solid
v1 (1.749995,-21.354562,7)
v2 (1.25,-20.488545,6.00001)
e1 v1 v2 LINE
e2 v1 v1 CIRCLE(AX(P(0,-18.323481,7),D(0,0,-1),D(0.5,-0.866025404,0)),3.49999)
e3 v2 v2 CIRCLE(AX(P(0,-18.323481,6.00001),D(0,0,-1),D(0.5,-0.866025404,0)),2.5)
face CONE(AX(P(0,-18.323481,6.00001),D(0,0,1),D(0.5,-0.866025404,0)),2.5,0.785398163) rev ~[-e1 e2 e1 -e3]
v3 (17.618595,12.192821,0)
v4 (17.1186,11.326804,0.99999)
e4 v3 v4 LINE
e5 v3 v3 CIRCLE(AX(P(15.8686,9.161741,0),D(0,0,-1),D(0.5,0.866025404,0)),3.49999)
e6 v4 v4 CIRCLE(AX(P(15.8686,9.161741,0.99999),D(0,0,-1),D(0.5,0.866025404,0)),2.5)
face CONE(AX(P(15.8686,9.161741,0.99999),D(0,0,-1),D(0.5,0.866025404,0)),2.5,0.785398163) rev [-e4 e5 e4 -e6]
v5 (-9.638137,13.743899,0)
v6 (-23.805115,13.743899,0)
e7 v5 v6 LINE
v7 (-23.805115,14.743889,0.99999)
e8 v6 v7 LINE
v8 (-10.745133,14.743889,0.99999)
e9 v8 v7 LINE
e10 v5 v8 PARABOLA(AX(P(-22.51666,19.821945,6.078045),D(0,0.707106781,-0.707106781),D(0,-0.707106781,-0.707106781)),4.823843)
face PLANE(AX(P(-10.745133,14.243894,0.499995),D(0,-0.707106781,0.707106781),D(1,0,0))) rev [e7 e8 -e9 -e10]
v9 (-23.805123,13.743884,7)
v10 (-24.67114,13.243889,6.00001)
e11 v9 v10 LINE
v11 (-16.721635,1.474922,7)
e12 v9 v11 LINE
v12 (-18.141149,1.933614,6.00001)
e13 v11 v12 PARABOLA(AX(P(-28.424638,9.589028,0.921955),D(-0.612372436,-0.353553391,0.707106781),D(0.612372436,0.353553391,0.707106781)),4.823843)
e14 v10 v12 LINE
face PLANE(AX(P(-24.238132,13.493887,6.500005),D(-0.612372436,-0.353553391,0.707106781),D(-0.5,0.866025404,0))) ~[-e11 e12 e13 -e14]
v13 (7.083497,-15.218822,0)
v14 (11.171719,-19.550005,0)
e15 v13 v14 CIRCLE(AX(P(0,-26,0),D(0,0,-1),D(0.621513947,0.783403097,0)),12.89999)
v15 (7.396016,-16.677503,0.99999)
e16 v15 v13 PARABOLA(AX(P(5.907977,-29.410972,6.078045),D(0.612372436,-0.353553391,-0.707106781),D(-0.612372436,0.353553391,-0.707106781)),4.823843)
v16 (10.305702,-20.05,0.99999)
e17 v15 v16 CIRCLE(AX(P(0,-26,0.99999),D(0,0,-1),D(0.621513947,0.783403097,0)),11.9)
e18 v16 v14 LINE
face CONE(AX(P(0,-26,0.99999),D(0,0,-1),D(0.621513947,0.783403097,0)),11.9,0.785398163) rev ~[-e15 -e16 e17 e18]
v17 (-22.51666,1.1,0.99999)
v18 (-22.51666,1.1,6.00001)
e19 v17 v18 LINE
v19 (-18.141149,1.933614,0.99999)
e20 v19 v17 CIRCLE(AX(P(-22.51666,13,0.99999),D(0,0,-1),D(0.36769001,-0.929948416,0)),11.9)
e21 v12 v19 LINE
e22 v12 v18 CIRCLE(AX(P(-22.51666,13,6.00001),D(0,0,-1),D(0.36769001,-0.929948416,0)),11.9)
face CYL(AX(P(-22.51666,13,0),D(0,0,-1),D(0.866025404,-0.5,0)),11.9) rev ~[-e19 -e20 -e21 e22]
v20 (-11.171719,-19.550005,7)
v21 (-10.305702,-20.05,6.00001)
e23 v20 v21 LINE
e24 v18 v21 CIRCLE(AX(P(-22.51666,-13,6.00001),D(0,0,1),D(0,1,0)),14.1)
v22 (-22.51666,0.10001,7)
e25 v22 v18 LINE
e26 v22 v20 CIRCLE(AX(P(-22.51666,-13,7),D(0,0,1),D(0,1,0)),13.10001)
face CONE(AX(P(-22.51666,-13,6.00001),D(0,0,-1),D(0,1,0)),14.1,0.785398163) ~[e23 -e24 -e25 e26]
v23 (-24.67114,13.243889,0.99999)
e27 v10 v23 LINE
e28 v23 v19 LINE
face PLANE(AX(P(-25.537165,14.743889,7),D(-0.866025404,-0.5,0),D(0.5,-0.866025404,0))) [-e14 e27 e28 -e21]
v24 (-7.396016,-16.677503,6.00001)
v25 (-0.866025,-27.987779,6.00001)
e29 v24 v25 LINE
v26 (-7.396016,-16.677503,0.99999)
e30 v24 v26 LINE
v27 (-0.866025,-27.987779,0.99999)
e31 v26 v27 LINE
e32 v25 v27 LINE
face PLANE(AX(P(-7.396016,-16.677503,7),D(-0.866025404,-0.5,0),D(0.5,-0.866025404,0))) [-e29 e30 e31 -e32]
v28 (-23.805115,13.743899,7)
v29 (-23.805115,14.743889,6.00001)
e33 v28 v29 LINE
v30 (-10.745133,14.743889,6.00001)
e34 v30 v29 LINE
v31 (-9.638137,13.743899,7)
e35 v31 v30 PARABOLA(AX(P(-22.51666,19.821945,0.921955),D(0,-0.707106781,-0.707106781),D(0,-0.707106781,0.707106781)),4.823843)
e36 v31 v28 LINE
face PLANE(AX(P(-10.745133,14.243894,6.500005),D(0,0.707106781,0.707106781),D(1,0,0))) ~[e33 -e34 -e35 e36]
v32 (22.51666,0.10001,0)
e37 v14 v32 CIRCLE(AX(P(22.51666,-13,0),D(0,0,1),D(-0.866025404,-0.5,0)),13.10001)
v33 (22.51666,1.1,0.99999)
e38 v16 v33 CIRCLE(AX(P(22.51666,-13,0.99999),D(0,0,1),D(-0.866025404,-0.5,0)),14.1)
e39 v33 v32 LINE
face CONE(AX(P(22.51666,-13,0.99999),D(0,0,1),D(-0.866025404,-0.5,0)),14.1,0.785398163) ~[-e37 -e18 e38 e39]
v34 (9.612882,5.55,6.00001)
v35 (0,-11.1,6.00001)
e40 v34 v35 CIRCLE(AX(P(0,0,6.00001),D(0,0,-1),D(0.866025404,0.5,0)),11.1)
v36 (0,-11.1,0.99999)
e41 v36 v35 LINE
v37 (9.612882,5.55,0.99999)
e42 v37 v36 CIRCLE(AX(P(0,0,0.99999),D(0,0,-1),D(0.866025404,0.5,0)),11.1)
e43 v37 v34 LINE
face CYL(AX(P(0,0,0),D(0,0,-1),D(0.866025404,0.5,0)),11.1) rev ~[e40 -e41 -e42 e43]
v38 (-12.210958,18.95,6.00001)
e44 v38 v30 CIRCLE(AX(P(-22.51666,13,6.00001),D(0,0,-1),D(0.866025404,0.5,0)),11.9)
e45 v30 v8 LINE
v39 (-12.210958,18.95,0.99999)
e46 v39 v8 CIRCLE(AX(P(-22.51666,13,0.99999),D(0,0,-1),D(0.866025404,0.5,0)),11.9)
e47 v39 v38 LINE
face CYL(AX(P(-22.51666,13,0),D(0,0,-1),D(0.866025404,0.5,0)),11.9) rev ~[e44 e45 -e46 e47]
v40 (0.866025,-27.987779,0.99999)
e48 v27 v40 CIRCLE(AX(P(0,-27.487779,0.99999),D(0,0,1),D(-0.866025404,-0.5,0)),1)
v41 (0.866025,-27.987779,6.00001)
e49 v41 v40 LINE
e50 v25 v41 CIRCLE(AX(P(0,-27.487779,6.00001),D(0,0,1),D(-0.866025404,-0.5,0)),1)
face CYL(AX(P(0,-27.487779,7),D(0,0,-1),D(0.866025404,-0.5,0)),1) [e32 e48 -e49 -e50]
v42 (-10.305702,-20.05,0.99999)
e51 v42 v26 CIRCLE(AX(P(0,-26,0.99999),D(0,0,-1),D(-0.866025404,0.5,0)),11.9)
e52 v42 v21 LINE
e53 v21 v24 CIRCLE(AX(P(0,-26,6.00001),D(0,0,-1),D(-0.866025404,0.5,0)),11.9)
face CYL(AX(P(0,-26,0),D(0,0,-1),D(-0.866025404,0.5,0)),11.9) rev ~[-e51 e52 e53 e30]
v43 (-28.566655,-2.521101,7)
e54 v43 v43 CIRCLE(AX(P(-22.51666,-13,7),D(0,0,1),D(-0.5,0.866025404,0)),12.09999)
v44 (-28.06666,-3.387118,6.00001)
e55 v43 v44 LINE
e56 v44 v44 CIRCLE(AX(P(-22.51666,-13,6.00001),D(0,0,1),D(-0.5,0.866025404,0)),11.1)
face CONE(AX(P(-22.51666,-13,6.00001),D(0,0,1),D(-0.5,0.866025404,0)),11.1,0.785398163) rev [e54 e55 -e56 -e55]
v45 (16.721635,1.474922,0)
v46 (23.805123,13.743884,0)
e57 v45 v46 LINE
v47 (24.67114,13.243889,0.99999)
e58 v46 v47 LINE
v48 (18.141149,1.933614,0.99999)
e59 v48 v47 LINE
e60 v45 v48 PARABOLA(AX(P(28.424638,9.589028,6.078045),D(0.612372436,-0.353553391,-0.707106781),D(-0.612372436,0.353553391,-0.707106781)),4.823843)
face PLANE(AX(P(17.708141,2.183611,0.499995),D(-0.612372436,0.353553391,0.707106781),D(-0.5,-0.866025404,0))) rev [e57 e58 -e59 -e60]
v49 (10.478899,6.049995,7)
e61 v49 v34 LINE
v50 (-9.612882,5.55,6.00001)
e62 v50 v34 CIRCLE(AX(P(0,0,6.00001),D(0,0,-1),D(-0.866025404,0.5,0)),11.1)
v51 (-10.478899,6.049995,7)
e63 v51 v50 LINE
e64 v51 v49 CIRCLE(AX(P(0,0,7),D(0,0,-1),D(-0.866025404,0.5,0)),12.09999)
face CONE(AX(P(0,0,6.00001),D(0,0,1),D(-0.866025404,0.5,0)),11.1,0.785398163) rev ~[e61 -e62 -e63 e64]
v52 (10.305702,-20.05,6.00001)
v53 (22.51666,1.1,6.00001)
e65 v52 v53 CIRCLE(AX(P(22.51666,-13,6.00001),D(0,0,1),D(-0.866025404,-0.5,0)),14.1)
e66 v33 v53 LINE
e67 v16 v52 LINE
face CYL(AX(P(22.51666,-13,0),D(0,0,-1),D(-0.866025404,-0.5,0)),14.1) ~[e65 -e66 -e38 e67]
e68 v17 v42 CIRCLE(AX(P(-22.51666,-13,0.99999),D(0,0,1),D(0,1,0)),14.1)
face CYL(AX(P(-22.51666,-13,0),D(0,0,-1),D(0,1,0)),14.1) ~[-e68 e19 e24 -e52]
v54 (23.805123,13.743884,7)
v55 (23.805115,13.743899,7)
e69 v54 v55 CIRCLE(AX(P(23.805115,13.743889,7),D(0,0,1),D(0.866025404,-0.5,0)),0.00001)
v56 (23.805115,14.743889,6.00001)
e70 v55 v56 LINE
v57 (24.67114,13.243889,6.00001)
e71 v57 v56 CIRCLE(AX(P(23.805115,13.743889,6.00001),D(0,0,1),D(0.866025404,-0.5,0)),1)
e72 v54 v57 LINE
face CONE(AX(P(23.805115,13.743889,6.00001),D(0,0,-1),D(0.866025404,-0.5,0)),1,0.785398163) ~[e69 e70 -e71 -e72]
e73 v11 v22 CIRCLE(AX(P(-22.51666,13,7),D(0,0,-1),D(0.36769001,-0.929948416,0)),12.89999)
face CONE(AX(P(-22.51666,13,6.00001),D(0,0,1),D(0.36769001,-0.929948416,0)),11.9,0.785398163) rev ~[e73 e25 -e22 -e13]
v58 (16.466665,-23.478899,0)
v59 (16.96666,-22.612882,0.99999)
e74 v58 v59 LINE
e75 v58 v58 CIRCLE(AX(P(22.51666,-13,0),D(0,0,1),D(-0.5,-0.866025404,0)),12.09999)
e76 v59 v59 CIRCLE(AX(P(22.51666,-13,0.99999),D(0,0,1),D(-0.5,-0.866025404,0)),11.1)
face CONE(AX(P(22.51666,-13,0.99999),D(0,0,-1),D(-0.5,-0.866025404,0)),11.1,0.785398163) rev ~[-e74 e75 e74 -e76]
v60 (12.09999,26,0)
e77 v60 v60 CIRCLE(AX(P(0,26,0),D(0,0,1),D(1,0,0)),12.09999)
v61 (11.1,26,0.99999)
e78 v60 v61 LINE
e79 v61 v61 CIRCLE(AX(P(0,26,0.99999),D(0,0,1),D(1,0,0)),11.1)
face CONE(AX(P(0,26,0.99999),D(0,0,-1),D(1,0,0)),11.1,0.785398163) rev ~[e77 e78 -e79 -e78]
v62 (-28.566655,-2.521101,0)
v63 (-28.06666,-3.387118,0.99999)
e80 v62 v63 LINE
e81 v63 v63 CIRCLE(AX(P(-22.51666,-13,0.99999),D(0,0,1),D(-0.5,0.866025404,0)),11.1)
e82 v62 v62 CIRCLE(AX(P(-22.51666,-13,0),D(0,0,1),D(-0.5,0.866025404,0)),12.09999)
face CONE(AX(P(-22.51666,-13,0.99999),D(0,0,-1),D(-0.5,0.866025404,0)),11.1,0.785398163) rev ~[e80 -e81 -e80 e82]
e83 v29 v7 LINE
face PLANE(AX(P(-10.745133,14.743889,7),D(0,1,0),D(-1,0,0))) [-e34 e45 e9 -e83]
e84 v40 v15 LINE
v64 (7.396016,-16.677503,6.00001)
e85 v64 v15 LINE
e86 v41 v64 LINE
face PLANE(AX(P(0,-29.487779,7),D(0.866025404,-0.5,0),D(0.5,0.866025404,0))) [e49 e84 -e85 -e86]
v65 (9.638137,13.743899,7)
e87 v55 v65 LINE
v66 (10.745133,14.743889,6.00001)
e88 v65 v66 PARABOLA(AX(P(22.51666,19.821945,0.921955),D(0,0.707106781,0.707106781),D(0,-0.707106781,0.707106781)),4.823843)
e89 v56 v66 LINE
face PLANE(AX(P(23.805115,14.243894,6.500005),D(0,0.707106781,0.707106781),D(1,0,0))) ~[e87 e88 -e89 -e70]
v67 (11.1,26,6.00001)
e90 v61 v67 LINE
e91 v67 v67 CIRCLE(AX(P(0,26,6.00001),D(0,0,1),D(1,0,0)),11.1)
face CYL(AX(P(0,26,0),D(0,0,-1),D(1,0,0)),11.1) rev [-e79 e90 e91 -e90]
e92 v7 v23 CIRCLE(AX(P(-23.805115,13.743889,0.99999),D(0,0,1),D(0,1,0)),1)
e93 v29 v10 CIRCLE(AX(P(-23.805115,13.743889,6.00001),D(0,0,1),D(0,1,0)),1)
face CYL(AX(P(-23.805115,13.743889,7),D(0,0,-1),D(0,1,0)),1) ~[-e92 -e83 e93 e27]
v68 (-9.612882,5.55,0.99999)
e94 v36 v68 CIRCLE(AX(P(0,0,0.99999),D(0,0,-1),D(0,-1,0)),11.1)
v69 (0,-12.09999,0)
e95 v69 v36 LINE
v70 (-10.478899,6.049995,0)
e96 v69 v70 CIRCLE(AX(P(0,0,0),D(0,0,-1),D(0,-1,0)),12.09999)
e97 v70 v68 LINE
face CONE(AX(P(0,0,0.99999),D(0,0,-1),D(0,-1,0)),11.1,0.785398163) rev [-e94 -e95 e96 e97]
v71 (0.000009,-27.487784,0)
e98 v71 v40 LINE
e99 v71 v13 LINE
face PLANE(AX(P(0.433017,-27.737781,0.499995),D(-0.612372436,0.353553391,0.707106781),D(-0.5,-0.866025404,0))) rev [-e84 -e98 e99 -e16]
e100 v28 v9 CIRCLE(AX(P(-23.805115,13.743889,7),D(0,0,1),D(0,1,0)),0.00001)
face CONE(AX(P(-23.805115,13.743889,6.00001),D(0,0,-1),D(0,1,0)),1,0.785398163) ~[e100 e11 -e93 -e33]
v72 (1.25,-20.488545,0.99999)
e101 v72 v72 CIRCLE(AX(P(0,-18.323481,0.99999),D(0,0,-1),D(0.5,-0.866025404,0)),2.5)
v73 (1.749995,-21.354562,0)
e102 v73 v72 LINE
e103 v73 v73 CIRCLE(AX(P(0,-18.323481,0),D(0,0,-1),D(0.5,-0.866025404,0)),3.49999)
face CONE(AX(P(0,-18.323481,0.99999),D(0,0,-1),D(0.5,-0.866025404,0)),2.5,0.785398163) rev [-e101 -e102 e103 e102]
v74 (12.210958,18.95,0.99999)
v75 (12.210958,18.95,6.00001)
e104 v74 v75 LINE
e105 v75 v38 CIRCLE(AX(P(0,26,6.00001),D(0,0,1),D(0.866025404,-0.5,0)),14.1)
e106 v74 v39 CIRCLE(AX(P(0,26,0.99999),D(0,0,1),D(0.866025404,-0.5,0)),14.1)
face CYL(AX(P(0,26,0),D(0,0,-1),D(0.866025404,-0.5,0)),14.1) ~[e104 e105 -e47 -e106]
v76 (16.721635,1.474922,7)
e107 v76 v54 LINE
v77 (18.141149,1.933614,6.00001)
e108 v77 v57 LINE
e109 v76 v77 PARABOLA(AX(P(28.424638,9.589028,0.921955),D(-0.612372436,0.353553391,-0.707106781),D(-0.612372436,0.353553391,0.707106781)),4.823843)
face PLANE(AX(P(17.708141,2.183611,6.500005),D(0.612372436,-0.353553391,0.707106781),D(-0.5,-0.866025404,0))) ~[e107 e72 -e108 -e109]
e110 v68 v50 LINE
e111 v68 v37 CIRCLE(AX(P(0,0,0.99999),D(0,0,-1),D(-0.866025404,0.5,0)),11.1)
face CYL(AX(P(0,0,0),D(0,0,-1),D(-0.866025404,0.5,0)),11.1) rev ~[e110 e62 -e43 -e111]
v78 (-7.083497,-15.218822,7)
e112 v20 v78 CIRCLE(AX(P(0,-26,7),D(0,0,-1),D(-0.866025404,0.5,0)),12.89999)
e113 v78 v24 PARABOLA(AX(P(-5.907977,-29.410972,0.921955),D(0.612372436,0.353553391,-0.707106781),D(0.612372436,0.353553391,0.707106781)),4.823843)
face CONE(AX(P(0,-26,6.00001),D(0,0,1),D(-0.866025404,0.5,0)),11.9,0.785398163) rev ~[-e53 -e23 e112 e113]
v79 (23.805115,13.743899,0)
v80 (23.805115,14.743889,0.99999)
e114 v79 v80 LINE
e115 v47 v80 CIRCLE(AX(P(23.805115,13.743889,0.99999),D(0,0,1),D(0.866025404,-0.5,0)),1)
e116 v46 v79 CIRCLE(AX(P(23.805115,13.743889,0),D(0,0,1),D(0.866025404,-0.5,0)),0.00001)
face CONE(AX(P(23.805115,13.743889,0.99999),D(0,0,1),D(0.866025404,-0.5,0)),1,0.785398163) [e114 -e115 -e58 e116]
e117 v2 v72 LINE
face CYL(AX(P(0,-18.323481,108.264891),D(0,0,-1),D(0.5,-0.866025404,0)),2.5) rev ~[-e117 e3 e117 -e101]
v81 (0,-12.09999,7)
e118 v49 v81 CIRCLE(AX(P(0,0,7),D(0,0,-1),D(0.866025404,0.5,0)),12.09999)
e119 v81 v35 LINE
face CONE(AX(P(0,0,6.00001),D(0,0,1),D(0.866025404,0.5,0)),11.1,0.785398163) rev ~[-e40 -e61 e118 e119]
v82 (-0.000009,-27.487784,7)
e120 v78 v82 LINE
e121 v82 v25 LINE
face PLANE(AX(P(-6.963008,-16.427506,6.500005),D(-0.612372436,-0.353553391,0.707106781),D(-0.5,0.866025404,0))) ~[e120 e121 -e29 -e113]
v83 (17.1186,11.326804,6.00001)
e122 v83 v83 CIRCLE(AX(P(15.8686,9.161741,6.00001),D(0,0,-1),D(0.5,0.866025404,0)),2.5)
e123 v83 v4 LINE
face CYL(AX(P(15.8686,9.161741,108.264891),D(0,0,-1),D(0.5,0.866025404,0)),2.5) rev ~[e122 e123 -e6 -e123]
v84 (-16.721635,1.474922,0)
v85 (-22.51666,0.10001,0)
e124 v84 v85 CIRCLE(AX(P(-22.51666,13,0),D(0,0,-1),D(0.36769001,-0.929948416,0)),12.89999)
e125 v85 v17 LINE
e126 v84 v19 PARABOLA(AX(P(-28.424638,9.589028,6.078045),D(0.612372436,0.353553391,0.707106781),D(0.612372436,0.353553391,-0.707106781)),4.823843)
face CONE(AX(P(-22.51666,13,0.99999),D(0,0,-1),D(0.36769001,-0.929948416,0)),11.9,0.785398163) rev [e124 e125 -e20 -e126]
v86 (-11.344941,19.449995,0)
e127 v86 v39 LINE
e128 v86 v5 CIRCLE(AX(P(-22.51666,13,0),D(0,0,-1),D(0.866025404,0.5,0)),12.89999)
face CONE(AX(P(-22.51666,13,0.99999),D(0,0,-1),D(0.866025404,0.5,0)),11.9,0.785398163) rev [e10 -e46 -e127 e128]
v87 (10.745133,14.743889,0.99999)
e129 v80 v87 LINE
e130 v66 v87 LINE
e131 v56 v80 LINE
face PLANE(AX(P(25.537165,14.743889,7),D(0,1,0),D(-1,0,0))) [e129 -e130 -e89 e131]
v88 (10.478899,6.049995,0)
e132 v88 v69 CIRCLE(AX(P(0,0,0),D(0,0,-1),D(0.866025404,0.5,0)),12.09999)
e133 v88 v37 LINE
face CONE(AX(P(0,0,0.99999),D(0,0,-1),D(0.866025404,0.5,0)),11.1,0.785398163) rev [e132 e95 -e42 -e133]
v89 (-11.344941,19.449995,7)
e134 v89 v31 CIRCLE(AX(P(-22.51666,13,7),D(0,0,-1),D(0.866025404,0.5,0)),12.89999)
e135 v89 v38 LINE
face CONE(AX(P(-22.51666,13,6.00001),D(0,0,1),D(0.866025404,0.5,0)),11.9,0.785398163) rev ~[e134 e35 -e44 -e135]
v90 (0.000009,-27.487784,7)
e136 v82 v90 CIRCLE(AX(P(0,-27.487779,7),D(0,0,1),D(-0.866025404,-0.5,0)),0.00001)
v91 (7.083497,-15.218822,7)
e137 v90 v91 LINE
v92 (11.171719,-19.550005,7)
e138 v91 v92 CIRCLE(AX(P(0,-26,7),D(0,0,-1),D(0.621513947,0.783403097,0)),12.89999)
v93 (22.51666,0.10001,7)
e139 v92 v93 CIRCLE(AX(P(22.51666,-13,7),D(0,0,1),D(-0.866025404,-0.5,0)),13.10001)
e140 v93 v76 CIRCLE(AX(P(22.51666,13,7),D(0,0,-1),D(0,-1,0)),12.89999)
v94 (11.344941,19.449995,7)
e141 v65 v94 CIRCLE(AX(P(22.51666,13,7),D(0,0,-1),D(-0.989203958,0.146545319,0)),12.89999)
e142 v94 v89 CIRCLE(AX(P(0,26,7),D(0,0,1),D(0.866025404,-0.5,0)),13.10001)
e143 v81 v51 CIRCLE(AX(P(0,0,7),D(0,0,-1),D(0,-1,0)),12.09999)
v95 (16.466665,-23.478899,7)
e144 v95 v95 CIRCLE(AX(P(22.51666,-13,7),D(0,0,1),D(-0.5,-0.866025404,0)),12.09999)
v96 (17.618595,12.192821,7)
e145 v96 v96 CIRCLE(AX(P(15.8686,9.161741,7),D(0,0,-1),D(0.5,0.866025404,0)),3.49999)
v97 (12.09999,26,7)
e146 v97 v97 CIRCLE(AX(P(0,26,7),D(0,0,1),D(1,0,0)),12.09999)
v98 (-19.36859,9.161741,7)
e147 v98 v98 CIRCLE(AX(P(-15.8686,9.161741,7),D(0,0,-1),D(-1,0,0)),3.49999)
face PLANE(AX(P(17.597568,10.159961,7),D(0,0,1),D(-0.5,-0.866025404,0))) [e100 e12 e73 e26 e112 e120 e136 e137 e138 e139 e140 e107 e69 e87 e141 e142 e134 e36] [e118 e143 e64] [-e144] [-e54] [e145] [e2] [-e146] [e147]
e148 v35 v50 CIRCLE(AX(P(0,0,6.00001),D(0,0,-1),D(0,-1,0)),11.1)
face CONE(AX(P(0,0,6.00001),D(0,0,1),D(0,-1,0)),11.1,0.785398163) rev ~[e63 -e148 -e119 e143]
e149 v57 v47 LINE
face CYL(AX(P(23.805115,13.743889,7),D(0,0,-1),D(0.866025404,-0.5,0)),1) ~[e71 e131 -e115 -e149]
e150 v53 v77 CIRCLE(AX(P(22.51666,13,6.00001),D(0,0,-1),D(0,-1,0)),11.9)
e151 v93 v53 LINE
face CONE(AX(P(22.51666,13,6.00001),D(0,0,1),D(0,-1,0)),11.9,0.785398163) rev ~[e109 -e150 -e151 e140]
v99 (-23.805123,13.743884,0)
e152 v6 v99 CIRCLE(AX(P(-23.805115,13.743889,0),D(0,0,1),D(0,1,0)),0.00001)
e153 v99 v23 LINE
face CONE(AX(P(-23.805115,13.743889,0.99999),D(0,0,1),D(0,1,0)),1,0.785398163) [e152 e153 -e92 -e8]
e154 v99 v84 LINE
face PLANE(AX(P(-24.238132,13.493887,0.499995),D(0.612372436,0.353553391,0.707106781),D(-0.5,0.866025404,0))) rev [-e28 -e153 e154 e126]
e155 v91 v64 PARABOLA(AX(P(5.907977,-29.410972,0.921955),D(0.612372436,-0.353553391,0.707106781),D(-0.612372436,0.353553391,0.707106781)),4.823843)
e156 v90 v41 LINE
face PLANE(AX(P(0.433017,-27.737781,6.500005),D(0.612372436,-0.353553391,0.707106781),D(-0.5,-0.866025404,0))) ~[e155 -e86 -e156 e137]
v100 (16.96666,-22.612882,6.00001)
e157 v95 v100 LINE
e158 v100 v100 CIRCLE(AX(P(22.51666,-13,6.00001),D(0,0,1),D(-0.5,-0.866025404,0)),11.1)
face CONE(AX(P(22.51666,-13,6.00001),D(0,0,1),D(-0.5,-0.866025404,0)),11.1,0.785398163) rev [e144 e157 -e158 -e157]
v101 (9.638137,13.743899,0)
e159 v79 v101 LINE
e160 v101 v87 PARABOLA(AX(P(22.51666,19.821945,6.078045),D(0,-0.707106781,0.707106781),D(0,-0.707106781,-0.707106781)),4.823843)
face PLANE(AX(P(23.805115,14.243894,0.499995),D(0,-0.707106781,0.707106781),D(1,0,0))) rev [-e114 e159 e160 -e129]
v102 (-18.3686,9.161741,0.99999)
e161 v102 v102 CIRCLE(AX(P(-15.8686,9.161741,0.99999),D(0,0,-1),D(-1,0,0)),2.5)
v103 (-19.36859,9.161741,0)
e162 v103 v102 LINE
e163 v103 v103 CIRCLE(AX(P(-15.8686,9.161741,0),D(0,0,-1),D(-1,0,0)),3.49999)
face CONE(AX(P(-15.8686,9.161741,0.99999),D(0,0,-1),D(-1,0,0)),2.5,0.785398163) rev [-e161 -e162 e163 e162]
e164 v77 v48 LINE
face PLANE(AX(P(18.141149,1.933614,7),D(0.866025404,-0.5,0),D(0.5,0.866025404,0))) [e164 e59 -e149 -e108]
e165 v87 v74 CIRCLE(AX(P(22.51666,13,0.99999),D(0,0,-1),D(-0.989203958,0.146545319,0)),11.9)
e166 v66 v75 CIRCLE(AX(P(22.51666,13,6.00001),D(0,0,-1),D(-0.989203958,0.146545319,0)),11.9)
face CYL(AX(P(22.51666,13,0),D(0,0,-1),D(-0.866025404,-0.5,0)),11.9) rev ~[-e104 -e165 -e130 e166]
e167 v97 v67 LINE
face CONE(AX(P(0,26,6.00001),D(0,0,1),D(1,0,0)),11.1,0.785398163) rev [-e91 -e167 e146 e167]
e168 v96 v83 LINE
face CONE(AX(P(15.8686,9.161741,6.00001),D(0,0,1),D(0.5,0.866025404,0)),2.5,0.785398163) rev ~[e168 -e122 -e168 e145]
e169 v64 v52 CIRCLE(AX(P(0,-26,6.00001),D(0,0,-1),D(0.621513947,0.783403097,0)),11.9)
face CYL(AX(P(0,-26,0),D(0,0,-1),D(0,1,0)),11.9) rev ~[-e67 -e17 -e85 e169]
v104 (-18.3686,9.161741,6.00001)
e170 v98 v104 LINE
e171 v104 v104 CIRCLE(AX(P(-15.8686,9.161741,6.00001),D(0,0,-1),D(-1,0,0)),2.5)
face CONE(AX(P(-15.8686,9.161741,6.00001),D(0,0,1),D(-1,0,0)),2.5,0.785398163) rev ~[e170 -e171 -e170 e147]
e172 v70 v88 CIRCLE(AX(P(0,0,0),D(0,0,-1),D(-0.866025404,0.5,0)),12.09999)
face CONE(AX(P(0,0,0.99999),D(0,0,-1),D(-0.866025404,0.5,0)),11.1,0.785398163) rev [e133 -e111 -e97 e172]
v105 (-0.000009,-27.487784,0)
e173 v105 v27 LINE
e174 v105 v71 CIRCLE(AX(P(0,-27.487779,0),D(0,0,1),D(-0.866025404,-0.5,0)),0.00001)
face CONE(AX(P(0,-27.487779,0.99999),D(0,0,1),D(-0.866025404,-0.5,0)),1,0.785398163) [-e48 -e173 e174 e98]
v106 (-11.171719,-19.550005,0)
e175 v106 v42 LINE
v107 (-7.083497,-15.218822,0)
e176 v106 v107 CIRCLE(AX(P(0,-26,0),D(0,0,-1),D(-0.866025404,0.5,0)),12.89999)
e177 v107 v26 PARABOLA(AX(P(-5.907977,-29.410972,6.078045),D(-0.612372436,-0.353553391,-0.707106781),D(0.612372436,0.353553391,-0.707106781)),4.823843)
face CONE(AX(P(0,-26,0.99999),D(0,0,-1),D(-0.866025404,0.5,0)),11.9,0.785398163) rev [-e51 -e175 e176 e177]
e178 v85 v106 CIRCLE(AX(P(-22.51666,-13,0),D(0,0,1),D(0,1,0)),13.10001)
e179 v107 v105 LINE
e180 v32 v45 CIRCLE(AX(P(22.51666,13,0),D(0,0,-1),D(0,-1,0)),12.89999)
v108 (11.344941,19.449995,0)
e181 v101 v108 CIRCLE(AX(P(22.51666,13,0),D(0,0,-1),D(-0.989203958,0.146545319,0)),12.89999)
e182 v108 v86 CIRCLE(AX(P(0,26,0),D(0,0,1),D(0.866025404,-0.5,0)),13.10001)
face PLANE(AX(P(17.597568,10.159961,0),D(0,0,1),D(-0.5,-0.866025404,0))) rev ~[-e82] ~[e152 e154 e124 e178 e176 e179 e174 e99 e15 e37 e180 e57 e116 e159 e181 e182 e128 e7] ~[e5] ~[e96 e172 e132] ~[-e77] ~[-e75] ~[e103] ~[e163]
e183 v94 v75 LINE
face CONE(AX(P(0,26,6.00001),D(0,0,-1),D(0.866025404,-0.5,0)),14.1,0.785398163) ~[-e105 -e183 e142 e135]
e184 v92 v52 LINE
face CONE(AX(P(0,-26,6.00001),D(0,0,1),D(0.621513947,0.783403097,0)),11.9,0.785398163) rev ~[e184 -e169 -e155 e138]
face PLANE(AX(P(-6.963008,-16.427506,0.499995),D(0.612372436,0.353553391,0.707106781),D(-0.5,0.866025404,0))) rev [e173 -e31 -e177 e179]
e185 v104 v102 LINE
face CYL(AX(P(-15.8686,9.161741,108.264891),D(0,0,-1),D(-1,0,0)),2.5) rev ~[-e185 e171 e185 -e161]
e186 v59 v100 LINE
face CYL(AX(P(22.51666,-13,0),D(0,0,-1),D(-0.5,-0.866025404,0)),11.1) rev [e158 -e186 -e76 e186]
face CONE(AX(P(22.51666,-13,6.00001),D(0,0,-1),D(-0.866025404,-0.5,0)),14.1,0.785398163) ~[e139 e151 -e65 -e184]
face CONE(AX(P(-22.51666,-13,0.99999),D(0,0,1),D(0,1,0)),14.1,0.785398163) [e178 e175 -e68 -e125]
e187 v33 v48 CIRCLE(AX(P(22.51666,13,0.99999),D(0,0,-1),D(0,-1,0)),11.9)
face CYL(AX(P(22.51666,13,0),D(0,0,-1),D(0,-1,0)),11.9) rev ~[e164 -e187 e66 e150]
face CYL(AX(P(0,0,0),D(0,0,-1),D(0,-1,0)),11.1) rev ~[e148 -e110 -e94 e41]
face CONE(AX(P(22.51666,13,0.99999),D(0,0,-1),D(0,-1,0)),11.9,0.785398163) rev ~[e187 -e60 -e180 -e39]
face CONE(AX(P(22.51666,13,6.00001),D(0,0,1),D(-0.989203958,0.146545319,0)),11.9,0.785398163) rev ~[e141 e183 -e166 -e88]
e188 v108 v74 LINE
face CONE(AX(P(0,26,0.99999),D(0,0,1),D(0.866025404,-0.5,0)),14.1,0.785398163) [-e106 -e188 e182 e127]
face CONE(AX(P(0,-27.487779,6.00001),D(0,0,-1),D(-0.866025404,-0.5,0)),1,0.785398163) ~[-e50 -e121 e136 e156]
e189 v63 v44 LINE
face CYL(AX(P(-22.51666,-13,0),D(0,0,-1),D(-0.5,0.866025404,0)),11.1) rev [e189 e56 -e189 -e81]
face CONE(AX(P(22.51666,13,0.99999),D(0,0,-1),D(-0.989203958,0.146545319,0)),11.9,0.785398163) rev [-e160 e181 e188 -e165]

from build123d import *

# Parameters (mm, degrees)
F0_R            = 11.1
F1_DEPTH        = 7
F2_COUNT        = 3
F5_DEPTH        = 7
F5_COPIES_COUNT = 3
F6_D            = 5
F6_COPIES_COUNT = 3
F7_R            = 1
F8_SIZE         = 0.99999


# Not quite as in the source:
# - a fillet or chamfer is up to 0.001 mm smaller than in the source, because OpenCascade refuses the exact size
# - a pattern or mirror of a feature is missing from the dataset's text; its kind, count and spacing are read off the source's solid


with BuildPart() as f1:
    # F0 (on Top) → F1 (new body)
    with BuildSketch(Plane.XY):
        with BuildLine():
            ThreePointArc((-9.612881982, 5.55), (0, 11.1), (9.612881982, 5.55))
            Line((9.612881982, 5.55), (11.2583302492, 6.5))
            Line((11.2583302492, 6.5), (12.2109581934, 7.05))
            ThreePointArc((12.2109581934, 7.05), (10.6166604984, 13), (12.2109581934, 18.95))
            ThreePointArc((12.2109581934, 18.95), (0, 40.1), (-12.2109581934, 18.95))
            ThreePointArc((-12.2109581934, 18.95), (-10.6166604984, 13), (-12.2109581934, 7.05))
            Line((-12.2109581934, 7.05), (-11.2583302492, 6.5))
            Line((-11.2583302492, 6.5), (-9.612881982, 5.55))
        make_face()
        with Locations((0, 26)):
            Circle(F0_R, mode=Mode.SUBTRACT)
    extrude(amount=F1_DEPTH)

    # F2: F1 ×3 about axis
    f2_axis = Axis((0, 0, 0), (0, 0, 1))


with BuildPart() as f1_1:
    add(f1.part)
    for i in range(1, F2_COUNT):
        add(f1.part.rotate(f2_axis, i * 360 / F2_COUNT))

    # F4 (on face) → F5 (join)
    with BuildSketch(Plane.XY.offset(7)):
        with BuildLine():
            ThreePointArc((-18.1411493779, 1.9336138494), (-12.2109581934, 7.05), (-10.7451334036, 14.7438892904))
            Line((-10.7451334036, 14.7438892904), (-25.5371653521, 14.7438892904))
            Line((-25.5371653521, 14.7438892904), (-18.1411493779, 1.9336138494))
        make_face()
    f5 = extrude(amount=-F5_DEPTH)

    # F5_copies: F5 ×3 about axis
    f5_copies_axis = Axis((0, 0, 0), (0, 0, 1))
    for i in range(1, F5_COPIES_COUNT):
        add(f5.rotate(f5_copies_axis, i * 360 / F5_COPIES_COUNT))

    # F6 (through all)
    with Locations(Plane.XY.offset(7)):
        with Locations((-15.8686004579, 9.161740746)):
            f6 = Hole(F6_D / 2)

    # F6_copies: F6 ×3 about axis
    f6_copies_axis = Axis((0, 0, 0), (0, 0, 1))
    for i in range(1, F6_COPIES_COUNT):
        add(f6.rotate(f6_copies_axis, i * 360 / F6_COPIES_COUNT), mode=Mode.SUBTRACT)

    # F7
    f7_edges = [f1_1.edges().sort_by_distance(p)[0] for p in [
        (-25.537165, 14.743889, 3.5),
        (25.537165, 14.743889, 3.5),
        (0, -29.487779, 3.5),
    ]]
    fillet(f7_edges, radius=F7_R)

    # F8 (size 1 in the source; OpenCascade refuses exactly that, so slightly less here)
    f8_edges = [f1_1.edges().sort_by_distance(p)[0] for p in [
        (17.275124, 14.743889, 0),
        (24.67114, 14.243889, 0),
        (11.279496, 16.916139, 0),
        (21.406145, 7.588752, 0),
        (0, 40.1, 0),
        (20.289554, 1.310261, 0),
        (-11.279496, 16.916139, 0),
        (34.727619, -20.05, 0),
        (-17.275124, 14.743889, 0),
        (9.010058, -18.2264, 0),
        (-24.67114, 14.243889, 0),
        (4.131021, -22.332641, 0),
        (-21.406145, 7.588752, 0),
        (0, -28.487779, 0),
        (-20.289554, 1.310261, 0),
        (-4.131021, -22.332641, 0),
        (-34.727619, -20.05, 0),
        (-9.010058, -18.2264, 0),
        (-16.96666, -22.612882, 0),
        (1.25, -20.488545, 0),
        (28.06666, -3.387118, 0),
        (-9.612882, -5.55, 0),
        (-18.3686, 9.161741, 0),
        (17.1186, 11.326804, 0),
        (-11.1, 26, 0),
        (17.275124, 14.743889, 7),
        (24.67114, 14.243889, 7),
        (11.279496, 16.916139, 7),
        (21.406145, 7.588752, 7),
        (0, 40.1, 7),
        (20.289554, 1.310261, 7),
        (-11.279496, 16.916139, 7),
        (34.727619, -20.05, 7),
        (-17.275124, 14.743889, 7),
        (9.010058, -18.2264, 7),
        (-24.67114, 14.243889, 7),
        (4.131021, -22.332641, 7),
        (-21.406145, 7.588752, 7),
        (0, -28.487779, 7),
        (-20.289554, 1.310261, 7),
        (-4.131021, -22.332641, 7),
        (-34.727619, -20.05, 7),
        (-9.010058, -18.2264, 7),
        (-16.96666, -22.612882, 7),
        (1.25, -20.488545, 7),
        (28.06666, -3.387118, 7),
        (-9.612882, -5.55, 7),
        (-18.3686, 9.161741, 7),
        (17.1186, 11.326804, 7),
        (-11.1, 26, 7),
    ]]
    chamfer(f8_edges, length=F8_SIZE)


solid = f1_1.part
